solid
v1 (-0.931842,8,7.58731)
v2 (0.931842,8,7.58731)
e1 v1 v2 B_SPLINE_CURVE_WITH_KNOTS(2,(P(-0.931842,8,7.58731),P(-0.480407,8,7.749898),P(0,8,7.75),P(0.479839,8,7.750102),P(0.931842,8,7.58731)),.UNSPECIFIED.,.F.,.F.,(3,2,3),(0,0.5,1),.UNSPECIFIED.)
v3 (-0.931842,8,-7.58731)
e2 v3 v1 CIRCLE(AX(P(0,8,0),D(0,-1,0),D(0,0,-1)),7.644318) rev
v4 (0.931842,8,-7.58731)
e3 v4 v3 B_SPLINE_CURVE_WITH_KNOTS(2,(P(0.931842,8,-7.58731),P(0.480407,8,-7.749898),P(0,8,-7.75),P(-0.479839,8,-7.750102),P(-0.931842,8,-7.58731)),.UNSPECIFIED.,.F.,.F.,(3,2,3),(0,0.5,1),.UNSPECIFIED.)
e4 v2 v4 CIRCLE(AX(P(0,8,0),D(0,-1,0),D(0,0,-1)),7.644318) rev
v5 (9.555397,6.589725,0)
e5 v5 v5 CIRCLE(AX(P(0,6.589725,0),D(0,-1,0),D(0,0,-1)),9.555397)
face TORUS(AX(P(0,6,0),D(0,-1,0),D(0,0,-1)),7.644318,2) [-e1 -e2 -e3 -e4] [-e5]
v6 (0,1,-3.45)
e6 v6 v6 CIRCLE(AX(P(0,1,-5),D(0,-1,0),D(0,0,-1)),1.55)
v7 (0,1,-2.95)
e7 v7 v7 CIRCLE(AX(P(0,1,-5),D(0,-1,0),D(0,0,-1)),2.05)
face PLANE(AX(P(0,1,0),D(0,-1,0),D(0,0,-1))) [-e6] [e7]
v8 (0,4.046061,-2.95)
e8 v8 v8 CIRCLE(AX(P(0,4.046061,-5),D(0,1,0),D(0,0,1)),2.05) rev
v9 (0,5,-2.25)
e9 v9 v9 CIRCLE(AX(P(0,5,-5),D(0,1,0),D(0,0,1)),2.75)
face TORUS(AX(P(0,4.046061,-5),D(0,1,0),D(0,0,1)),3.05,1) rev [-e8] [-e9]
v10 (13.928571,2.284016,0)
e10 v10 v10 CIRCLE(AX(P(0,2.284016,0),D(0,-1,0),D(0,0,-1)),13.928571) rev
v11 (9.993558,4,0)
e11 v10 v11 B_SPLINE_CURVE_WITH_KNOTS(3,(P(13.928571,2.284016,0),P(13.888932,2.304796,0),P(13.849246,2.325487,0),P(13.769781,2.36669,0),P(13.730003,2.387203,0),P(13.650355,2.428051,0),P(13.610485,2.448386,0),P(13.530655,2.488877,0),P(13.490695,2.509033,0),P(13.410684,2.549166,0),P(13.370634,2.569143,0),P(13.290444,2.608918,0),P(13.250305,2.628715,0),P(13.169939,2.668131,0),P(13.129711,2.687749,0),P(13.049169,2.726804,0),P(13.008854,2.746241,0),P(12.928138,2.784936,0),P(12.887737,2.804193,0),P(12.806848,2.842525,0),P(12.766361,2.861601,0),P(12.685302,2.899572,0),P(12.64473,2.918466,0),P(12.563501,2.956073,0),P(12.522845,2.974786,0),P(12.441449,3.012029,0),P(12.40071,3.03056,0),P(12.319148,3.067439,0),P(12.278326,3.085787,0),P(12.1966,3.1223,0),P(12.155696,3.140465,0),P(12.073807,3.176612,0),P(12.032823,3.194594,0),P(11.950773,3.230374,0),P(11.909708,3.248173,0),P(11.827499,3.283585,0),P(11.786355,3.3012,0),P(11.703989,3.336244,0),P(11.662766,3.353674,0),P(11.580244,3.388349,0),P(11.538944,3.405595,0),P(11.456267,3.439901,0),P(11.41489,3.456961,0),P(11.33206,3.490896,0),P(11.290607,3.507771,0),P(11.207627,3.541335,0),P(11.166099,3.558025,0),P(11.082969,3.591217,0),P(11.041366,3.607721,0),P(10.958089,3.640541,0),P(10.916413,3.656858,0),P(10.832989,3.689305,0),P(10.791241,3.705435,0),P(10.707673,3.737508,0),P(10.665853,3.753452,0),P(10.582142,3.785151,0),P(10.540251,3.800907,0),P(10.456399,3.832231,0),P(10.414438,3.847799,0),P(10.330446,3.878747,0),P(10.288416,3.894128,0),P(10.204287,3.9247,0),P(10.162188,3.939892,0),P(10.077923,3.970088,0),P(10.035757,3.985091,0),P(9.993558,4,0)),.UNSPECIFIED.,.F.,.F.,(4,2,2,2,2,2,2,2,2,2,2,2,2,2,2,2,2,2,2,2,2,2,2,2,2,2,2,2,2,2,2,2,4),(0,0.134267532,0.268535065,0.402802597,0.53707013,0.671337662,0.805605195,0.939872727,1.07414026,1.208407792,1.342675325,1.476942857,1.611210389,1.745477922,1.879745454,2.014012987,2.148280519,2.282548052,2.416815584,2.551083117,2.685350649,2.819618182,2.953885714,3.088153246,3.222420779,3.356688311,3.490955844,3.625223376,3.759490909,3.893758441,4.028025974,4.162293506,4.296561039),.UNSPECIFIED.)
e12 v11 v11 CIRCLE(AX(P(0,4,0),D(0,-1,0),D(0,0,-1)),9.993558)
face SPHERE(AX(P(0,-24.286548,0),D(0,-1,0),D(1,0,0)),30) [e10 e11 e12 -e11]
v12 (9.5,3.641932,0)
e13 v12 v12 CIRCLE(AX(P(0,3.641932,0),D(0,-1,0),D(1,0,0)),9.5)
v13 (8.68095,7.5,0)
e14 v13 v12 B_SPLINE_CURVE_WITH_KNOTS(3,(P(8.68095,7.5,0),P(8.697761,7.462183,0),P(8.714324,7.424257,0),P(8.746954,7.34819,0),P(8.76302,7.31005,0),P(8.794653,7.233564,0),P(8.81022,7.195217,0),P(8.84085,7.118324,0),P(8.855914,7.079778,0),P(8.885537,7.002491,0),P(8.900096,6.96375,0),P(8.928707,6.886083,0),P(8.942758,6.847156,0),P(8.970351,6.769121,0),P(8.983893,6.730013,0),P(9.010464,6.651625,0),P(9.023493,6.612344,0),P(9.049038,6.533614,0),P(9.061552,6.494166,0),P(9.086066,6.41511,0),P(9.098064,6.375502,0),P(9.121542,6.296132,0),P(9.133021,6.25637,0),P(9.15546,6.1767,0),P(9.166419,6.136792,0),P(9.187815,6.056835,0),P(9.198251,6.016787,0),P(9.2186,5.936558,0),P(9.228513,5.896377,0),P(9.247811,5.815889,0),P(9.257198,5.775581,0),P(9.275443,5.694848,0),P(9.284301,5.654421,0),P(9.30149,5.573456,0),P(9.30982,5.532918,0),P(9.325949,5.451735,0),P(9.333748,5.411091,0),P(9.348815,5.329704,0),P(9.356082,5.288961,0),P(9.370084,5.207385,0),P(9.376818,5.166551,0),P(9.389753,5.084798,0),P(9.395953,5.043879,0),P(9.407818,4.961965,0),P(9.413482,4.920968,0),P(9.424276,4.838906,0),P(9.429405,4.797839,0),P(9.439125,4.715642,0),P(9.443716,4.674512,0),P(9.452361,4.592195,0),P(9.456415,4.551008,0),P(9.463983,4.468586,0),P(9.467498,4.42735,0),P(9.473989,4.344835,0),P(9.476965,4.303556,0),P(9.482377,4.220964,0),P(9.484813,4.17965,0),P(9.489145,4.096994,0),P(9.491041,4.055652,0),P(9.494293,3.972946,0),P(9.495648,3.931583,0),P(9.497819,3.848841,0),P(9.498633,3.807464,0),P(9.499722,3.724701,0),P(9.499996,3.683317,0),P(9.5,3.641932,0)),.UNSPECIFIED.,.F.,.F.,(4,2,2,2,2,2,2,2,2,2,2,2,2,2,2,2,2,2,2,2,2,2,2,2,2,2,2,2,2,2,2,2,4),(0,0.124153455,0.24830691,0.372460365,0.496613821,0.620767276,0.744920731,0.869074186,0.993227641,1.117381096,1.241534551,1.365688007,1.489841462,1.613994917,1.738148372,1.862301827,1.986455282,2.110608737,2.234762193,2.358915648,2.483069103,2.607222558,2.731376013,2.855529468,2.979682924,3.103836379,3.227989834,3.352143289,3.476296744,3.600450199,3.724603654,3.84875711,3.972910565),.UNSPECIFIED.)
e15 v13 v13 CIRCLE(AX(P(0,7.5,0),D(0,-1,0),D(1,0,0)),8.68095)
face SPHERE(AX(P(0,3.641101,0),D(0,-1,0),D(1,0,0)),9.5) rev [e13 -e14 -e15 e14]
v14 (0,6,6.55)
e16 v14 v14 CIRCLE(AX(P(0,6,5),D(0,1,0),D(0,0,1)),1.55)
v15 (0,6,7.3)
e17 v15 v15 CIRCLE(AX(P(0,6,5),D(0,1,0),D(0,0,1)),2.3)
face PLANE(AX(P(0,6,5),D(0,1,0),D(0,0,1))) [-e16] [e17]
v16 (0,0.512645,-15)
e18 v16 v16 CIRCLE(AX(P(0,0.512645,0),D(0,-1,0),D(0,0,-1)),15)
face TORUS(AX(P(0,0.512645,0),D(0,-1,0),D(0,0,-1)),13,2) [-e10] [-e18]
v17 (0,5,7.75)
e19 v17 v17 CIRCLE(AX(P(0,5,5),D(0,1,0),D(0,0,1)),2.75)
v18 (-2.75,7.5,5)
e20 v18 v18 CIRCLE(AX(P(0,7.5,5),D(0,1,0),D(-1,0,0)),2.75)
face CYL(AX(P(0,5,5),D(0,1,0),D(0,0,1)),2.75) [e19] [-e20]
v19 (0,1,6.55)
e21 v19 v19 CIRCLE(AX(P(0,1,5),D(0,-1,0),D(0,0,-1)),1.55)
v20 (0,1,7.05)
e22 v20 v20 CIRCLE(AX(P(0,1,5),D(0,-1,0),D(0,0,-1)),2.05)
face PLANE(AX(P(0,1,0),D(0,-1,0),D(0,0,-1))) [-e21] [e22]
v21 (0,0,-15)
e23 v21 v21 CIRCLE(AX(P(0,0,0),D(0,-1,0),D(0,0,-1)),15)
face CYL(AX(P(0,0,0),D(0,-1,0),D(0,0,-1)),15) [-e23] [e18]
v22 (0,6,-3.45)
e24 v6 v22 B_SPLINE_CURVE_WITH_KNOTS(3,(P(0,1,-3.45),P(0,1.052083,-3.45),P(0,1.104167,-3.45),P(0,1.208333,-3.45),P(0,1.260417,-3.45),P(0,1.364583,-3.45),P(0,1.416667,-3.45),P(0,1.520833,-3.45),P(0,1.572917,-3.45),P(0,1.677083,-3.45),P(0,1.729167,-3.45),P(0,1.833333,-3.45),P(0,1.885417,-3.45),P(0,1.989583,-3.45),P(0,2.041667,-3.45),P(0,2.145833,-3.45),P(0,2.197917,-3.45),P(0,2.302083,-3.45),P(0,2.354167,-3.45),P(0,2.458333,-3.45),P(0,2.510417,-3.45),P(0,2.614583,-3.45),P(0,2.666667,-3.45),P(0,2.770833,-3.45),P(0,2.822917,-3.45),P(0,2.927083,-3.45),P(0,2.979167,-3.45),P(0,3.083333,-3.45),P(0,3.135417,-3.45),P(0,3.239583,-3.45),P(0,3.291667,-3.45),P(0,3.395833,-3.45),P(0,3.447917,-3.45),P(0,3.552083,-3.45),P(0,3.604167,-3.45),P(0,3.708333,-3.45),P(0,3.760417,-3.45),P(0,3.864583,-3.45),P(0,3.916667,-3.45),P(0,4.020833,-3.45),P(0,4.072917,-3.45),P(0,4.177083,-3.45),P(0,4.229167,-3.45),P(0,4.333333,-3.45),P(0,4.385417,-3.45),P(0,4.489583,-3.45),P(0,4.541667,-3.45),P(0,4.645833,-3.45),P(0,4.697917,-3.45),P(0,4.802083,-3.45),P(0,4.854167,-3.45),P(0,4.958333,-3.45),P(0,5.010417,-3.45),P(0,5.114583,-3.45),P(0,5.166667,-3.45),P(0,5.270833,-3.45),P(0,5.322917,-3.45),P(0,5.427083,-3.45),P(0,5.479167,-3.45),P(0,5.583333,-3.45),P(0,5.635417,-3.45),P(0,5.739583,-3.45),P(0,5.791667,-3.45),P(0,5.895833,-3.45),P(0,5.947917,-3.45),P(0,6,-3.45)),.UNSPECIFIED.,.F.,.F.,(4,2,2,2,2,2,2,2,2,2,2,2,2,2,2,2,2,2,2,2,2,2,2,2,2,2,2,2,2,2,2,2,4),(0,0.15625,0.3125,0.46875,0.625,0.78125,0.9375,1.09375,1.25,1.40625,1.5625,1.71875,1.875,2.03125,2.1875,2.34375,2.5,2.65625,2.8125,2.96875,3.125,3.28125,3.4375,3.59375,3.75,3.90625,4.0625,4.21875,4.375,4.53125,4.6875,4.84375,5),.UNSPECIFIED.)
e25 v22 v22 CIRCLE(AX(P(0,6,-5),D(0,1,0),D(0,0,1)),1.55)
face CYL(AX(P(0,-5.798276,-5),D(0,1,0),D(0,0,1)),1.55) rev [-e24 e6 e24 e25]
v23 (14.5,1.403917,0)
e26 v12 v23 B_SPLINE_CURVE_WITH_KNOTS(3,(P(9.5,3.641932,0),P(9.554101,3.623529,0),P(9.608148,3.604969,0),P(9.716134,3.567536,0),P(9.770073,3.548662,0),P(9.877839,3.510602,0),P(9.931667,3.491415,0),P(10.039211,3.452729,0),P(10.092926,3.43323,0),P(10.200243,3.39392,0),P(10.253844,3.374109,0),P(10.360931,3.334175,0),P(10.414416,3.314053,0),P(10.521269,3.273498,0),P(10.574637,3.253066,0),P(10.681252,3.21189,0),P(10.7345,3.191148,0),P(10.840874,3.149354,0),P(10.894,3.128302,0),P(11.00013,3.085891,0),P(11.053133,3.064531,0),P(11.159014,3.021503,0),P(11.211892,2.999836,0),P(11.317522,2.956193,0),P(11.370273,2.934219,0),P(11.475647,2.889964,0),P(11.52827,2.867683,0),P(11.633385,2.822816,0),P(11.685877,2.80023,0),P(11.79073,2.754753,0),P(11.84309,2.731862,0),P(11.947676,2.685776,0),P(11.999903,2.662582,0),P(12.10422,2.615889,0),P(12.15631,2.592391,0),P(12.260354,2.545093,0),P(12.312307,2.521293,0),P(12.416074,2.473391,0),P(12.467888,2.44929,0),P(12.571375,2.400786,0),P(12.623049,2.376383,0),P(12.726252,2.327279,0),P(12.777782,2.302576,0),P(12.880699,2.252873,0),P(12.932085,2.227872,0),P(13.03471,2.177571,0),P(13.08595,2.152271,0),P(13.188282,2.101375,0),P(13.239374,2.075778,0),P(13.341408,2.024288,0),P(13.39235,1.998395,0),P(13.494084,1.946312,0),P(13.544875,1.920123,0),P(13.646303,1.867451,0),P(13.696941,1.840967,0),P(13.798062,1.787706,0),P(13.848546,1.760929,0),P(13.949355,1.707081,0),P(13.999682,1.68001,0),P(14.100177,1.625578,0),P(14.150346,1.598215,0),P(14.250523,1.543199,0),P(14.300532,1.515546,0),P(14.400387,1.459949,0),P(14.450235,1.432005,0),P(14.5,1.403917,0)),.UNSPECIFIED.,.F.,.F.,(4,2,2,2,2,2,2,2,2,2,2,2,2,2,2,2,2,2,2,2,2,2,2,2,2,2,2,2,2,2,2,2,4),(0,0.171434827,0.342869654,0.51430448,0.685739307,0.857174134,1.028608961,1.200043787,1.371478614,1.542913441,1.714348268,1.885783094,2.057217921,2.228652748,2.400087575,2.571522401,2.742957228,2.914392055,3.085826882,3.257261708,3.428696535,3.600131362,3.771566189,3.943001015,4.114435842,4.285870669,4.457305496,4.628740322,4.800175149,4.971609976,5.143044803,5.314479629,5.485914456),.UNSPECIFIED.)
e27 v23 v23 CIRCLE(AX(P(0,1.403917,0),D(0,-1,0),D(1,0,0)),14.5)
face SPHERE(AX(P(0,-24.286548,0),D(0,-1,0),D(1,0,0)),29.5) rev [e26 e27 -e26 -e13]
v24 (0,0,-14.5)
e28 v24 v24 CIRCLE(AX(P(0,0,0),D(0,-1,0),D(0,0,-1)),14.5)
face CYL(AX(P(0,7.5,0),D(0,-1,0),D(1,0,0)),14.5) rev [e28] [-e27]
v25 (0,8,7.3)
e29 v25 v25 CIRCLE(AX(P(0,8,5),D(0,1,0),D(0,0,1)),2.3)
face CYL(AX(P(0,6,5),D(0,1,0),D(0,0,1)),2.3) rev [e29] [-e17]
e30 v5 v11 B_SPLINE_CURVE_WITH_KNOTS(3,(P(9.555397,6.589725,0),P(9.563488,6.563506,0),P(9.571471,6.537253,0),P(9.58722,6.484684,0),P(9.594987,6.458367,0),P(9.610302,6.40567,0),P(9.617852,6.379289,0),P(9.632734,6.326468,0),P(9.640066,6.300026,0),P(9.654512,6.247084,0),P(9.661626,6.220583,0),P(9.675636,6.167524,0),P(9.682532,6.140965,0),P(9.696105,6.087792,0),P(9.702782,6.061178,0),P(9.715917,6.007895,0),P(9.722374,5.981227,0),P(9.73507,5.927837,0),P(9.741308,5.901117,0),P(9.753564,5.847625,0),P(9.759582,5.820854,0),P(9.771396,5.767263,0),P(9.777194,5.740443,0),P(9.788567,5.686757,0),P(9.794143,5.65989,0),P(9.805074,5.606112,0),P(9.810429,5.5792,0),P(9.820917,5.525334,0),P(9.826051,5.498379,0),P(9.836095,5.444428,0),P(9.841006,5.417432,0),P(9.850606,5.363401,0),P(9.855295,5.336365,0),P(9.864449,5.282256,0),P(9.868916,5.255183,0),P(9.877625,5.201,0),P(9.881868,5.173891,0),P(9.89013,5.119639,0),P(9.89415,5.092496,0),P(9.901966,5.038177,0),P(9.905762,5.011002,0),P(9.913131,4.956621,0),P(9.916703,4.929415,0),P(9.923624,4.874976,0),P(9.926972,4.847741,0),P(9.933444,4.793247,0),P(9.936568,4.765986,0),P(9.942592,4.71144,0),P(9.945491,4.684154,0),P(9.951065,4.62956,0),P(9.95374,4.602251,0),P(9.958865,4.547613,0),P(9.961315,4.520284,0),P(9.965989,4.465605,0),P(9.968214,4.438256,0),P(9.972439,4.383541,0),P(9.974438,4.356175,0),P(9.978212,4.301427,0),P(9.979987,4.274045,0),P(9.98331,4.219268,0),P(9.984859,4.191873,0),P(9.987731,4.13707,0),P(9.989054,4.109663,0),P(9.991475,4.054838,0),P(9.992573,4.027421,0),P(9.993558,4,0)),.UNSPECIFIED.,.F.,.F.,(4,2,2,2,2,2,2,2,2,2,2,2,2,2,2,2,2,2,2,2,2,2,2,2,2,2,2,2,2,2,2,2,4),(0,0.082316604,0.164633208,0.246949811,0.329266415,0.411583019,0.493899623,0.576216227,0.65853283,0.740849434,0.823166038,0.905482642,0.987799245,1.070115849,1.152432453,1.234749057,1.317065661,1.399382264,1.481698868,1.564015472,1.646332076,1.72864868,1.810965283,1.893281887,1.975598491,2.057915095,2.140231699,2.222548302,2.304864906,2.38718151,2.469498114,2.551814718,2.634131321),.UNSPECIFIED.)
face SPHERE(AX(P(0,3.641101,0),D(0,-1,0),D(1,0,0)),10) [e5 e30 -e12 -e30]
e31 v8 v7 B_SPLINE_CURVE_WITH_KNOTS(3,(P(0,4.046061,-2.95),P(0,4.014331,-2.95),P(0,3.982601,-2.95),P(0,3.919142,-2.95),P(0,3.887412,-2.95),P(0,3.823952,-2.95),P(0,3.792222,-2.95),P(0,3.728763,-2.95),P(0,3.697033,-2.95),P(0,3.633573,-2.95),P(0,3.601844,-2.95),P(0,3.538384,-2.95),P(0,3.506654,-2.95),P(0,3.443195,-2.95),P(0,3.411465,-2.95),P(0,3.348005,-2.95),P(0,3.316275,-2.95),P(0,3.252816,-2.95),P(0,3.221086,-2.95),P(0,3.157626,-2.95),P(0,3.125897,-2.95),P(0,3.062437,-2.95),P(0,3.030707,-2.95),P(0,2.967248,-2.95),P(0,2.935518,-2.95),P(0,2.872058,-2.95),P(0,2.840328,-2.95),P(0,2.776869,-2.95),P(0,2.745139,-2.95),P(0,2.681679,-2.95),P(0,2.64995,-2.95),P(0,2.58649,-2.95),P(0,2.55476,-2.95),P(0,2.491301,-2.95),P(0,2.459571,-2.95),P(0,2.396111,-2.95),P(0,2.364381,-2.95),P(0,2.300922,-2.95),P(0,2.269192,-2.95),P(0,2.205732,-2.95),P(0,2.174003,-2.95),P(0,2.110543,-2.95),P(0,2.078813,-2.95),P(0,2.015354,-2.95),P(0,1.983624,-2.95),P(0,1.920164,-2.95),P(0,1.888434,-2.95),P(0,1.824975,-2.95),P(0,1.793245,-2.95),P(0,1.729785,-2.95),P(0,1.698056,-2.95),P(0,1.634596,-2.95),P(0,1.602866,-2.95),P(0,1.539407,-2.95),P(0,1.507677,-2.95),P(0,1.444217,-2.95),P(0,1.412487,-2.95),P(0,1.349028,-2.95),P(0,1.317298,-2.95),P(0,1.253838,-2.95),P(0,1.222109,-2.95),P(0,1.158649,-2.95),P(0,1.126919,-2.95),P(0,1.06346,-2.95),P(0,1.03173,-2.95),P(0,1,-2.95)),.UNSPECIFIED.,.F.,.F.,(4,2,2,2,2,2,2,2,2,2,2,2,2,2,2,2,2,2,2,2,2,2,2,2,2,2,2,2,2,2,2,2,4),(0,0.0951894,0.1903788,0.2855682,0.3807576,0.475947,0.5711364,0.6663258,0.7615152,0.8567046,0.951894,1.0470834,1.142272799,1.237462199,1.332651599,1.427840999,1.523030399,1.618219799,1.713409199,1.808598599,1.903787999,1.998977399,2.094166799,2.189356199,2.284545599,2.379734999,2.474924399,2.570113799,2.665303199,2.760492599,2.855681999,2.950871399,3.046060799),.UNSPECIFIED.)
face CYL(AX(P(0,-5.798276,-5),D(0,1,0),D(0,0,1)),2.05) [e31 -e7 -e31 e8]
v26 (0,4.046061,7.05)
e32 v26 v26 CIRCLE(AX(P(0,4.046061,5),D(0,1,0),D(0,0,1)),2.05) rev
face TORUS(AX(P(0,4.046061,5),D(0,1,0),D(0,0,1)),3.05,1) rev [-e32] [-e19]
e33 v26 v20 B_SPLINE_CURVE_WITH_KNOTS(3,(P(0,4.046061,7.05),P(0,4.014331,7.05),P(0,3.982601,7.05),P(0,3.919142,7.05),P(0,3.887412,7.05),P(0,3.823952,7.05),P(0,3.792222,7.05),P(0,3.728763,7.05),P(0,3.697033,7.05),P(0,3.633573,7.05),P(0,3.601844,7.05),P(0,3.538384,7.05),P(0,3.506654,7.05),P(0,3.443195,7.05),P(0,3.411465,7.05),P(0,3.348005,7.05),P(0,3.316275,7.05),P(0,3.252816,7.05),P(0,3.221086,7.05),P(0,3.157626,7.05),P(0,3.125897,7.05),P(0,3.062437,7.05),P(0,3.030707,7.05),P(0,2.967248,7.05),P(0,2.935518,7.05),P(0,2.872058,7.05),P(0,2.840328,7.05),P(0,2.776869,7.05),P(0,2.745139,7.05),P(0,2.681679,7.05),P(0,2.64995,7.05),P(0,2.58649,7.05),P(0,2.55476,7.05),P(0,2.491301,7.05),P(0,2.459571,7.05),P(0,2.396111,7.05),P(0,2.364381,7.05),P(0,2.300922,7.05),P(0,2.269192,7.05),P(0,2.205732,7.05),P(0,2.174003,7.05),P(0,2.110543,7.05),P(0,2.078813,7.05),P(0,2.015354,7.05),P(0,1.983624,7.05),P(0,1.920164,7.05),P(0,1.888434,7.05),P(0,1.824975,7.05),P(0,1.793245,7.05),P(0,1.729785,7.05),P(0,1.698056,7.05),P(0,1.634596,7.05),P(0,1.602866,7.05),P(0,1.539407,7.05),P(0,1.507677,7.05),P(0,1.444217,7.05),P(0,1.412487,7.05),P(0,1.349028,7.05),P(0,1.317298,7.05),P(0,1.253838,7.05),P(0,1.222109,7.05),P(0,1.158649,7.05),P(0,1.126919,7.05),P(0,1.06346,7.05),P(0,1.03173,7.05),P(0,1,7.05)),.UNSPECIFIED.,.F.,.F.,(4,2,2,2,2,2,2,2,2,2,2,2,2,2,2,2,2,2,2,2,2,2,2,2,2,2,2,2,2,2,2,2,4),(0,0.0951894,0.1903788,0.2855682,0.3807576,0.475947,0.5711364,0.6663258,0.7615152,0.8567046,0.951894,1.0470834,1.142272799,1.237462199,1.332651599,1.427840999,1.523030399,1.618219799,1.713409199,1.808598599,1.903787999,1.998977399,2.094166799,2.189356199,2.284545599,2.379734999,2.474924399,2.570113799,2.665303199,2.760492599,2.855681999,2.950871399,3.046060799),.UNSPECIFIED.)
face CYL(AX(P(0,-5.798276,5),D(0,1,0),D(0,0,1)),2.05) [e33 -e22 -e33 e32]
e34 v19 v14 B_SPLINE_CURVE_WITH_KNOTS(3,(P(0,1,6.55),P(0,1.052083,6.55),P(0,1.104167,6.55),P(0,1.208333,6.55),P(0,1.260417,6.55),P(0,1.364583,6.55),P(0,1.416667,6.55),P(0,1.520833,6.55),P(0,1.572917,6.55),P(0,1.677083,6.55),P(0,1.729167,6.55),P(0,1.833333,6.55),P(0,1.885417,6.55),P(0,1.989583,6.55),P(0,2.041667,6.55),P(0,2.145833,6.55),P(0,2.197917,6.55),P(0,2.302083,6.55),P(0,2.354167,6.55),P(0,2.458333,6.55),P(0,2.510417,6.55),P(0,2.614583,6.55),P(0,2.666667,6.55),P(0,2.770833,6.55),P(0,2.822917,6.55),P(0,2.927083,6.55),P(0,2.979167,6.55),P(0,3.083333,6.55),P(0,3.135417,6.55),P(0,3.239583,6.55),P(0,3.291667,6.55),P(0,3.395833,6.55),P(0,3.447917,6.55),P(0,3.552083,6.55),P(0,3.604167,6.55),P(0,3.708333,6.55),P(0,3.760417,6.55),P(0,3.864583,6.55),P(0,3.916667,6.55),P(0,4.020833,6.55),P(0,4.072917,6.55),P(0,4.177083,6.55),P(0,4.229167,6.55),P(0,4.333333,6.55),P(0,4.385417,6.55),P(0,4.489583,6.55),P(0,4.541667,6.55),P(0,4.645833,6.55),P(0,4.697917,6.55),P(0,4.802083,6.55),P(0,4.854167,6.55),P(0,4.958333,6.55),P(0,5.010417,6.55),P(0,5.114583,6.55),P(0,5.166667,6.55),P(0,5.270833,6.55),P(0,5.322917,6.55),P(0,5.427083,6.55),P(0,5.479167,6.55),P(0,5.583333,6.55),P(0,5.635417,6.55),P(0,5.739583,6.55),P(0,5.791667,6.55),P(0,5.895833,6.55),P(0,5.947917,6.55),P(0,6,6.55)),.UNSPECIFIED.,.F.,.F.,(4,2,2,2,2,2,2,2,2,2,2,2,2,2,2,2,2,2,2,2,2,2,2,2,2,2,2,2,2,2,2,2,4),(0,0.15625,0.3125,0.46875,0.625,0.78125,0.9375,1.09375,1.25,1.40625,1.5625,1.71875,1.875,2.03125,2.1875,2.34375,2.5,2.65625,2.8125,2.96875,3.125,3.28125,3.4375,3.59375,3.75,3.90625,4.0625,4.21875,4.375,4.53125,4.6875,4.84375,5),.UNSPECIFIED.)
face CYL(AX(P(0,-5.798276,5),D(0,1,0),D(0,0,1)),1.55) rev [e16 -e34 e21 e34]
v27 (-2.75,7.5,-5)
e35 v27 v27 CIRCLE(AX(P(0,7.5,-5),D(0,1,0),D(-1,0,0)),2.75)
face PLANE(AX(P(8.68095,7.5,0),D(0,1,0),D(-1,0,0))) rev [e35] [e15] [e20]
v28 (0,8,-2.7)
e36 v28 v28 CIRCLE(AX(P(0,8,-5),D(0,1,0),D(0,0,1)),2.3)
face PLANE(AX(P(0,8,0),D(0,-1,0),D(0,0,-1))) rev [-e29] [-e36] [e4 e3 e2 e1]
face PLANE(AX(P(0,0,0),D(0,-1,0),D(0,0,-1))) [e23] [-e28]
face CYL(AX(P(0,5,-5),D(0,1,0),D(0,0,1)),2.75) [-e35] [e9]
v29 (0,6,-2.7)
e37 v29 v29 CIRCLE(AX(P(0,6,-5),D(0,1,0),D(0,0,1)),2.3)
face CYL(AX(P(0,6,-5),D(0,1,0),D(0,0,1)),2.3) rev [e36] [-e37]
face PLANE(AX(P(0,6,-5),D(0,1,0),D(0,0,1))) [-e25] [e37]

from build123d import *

# Parameters (mm, degrees)
CROQUIS6_R              = 14.5
CORTAR_EXTRUIR2_DEPTH   = 0.5
CROQUIS7_R              = 2.05
CROQUIS7_R_2            = 1.55
SALIENTE_EXTRUIR1_DEPTH = 6.5
CORTAR_EXTRUIR3_START   = -5.5
CROQUIS8_R              = 1.55
CORTAR_EXTRUIR3_DEPTH   = 5.5
REDONDEO1_R             = 2
REDONDEO2_R             = 2
CROQUIS9_R              = 2.75
CROQUIS9_R_2            = 1.55
SALIENTE_EXTRUIR2_DEPTH = 3
REDONDEO3_R             = 1
CROQUIS10_R             = 2.3
CORTAR_EXTRUIR6_DEPTH   = 2


with BuildPart() as part:
    # Croquis3 → Revolución1 (revolve)
    with BuildSketch(Plane.XY):
        with BuildLine():
            Line((15, 0), (15, 1.694213924))
            ThreePointArc((15, 1.694213924), (12.549846274, 2.962329925), (9.993557502, 4))
            ThreePointArc((9.993557502, 4), (9.70509179, 6.051742746), (9, 8))
            Line((9, 8), (0, 8))
            Line((0, 8), (0, 0))
            Line((0, 0), (15, 0))
        make_face()
    revolve(axis=Axis((0, 0, 0), (0, 1, 0)))

    # Croquis4 → Cortar-Revolución1 (revolve, cut)
    with BuildSketch(Plane.XY):
        with BuildLine():
            Line((0, 0.5), (0, 7.5))
            Line((0, 7.5), (8.680950348, 7.5))
            ThreePointArc((8.680950348, 7.5), (9.292895722, 5.613938885), (9.499999964, 3.641931911))
            ThreePointArc((9.499999964, 3.641931911), (12.052061122, 2.639235415), (14.5, 1.403916968))
            Line((14.5, 1.403916968), (14.5, 0.5))
            Line((14.5, 0.5), (0, 0.5))
        make_face()
    revolve(axis=Axis((0, 7.5, 0), (0, 1, 0)), mode=Mode.SUBTRACT)

    # Croquis6 → Cortar-Extruir2 (cut)
    with BuildSketch(Plane.XZ):
        Circle(CROQUIS6_R)
    extrude(amount=-CORTAR_EXTRUIR2_DEPTH, mode=Mode.SUBTRACT)

    # Croquis7 → Saliente-Extruir1 (add)
    # profile 1 of 2: a face of its own
    with BuildSketch(Plane.XZ.offset(-7.5)):
        with Locations(Location((0, 5, 0), (0, 0, 90))):
            Circle(CROQUIS7_R)
        with Locations(Location((0, 5, 0), (0, 0, 90))):
            Circle(CROQUIS7_R_2, mode=Mode.SUBTRACT)
    # profile 2 of 2: a face of its own
    with BuildSketch(Plane.XZ.offset(-7.5)):
        with Locations(Location((0, -5, 0), (0, 0, 90))):
            Circle(CROQUIS7_R)
        with Locations(Location((0, -5, 0), (0, 0, 90))):
            Circle(CROQUIS7_R_2, mode=Mode.SUBTRACT)
    extrude(amount=SALIENTE_EXTRUIR1_DEPTH)

    # Croquis8 → Cortar-Extruir3 (cut)
    with BuildSketch(Plane.XZ.offset(-7.5).offset(CORTAR_EXTRUIR3_START)):
        with Locations(Location((0, -5, 0), (0, 0, 90))):
            Circle(CROQUIS8_R)
        with Locations(Location((0, 5, 0), (0, 0, 90))):
            Circle(CROQUIS8_R)
    extrude(amount=CORTAR_EXTRUIR3_DEPTH, mode=Mode.SUBTRACT)

    # Redondeo1
    redondeo1_edges = [part.edges().sort_by_distance(p)[0] for p in [
        (-9, 8, 0),
    ]]
    fillet(redondeo1_edges, radius=REDONDEO1_R)

    # Redondeo2
    redondeo2_edges = [part.edges().sort_by_distance(p)[0] for p in [
        (-15, 1.694213924, 0),
    ]]
    fillet(redondeo2_edges, radius=REDONDEO2_R)

    # Croquis9 → Saliente-Extruir2 (add)
    # profile 1 of 2: a face of its own
    with BuildSketch(Plane(origin=(0, 8, 0), x_dir=(1, 0, 0), z_dir=(0, 1, 0))):
        with Locations(Location((0, 5, 0), (0, 0, 270))):
            Circle(CROQUIS9_R)
        with Locations(Location((0, 5, 0), (0, 0, 270))):
            Circle(CROQUIS9_R_2, mode=Mode.SUBTRACT)
    # profile 2 of 2: a face of its own
    with BuildSketch(Plane(origin=(0, 8, 0), x_dir=(1, 0, 0), z_dir=(0, 1, 0))):
        with Locations(Location((0, -5, 0), (0, 0, 270))):
            Circle(CROQUIS9_R)
        with Locations(Location((0, -5, 0), (0, 0, 270))):
            Circle(CROQUIS9_R_2, mode=Mode.SUBTRACT)
    extrude(amount=-SALIENTE_EXTRUIR2_DEPTH)

    # Redondeo3
    # the kernel refuses this fillet: 1 mm, written as the material it adds along each edge
    with BuildSketch(Plane(origin=(0, 5, -5), x_dir=(0, 0, 1), z_dir=(-1, 0, 0))) as redondeo3_piece_1:
        with BuildLine():
            CenterArc((3.05, -0.953939201), REDONDEO3_R, 107.457603124, 72.542396876)
            Line((2.75, 0), (2.744, 0.019078784))
            ThreePointArc((2.744, 0.019078784), (2.4, 0.02), (2.05, 0.02))
            Line((2.05, 0.02), (2.03, 0))
            Line((2.03, 0), (2.03, -0.953939201))
            Line((2.03, -0.953939201), (2.05, -0.953939201))
        make_face()
    revolve(axis=Axis((0, 5, -5), (0, 1, 0)))
    with BuildSketch(Plane(origin=(0, 5, 5), x_dir=(0, 0, 1), z_dir=(-1, 0, 0))) as redondeo3_piece_2:
        with BuildLine():
            CenterArc((3.05, -0.953939201), REDONDEO3_R, 107.457603124, 72.542396876)
            Line((2.05, -0.953939201), (2.03, -0.953939201))
            Line((2.03, -0.953939201), (2.03, 0))
            Line((2.03, 0), (2.05, 0.02))
            ThreePointArc((2.05, 0.02), (2.4, 0.02), (2.744, 0.019078784))
            Line((2.744, 0.019078784), (2.75, 0))
        make_face()
    revolve(axis=Axis((0, 5, 5), (0, 1, 0)))

    # Croquis10 → Cortar-Extruir6 (cut)
    with BuildSketch(Plane(origin=(0, 8, 0), x_dir=(1, 0, 0), z_dir=(0, 1, 0))):
        with Locations(Location((0, 5, 0), (0, 0, 270))):
            Circle(CROQUIS10_R)
        with Locations(Location((0, -5, 0), (0, 0, 270))):
            Circle(CROQUIS10_R)
    extrude(amount=-CORTAR_EXTRUIR6_DEPTH, mode=Mode.SUBTRACT)


solid = part.part
